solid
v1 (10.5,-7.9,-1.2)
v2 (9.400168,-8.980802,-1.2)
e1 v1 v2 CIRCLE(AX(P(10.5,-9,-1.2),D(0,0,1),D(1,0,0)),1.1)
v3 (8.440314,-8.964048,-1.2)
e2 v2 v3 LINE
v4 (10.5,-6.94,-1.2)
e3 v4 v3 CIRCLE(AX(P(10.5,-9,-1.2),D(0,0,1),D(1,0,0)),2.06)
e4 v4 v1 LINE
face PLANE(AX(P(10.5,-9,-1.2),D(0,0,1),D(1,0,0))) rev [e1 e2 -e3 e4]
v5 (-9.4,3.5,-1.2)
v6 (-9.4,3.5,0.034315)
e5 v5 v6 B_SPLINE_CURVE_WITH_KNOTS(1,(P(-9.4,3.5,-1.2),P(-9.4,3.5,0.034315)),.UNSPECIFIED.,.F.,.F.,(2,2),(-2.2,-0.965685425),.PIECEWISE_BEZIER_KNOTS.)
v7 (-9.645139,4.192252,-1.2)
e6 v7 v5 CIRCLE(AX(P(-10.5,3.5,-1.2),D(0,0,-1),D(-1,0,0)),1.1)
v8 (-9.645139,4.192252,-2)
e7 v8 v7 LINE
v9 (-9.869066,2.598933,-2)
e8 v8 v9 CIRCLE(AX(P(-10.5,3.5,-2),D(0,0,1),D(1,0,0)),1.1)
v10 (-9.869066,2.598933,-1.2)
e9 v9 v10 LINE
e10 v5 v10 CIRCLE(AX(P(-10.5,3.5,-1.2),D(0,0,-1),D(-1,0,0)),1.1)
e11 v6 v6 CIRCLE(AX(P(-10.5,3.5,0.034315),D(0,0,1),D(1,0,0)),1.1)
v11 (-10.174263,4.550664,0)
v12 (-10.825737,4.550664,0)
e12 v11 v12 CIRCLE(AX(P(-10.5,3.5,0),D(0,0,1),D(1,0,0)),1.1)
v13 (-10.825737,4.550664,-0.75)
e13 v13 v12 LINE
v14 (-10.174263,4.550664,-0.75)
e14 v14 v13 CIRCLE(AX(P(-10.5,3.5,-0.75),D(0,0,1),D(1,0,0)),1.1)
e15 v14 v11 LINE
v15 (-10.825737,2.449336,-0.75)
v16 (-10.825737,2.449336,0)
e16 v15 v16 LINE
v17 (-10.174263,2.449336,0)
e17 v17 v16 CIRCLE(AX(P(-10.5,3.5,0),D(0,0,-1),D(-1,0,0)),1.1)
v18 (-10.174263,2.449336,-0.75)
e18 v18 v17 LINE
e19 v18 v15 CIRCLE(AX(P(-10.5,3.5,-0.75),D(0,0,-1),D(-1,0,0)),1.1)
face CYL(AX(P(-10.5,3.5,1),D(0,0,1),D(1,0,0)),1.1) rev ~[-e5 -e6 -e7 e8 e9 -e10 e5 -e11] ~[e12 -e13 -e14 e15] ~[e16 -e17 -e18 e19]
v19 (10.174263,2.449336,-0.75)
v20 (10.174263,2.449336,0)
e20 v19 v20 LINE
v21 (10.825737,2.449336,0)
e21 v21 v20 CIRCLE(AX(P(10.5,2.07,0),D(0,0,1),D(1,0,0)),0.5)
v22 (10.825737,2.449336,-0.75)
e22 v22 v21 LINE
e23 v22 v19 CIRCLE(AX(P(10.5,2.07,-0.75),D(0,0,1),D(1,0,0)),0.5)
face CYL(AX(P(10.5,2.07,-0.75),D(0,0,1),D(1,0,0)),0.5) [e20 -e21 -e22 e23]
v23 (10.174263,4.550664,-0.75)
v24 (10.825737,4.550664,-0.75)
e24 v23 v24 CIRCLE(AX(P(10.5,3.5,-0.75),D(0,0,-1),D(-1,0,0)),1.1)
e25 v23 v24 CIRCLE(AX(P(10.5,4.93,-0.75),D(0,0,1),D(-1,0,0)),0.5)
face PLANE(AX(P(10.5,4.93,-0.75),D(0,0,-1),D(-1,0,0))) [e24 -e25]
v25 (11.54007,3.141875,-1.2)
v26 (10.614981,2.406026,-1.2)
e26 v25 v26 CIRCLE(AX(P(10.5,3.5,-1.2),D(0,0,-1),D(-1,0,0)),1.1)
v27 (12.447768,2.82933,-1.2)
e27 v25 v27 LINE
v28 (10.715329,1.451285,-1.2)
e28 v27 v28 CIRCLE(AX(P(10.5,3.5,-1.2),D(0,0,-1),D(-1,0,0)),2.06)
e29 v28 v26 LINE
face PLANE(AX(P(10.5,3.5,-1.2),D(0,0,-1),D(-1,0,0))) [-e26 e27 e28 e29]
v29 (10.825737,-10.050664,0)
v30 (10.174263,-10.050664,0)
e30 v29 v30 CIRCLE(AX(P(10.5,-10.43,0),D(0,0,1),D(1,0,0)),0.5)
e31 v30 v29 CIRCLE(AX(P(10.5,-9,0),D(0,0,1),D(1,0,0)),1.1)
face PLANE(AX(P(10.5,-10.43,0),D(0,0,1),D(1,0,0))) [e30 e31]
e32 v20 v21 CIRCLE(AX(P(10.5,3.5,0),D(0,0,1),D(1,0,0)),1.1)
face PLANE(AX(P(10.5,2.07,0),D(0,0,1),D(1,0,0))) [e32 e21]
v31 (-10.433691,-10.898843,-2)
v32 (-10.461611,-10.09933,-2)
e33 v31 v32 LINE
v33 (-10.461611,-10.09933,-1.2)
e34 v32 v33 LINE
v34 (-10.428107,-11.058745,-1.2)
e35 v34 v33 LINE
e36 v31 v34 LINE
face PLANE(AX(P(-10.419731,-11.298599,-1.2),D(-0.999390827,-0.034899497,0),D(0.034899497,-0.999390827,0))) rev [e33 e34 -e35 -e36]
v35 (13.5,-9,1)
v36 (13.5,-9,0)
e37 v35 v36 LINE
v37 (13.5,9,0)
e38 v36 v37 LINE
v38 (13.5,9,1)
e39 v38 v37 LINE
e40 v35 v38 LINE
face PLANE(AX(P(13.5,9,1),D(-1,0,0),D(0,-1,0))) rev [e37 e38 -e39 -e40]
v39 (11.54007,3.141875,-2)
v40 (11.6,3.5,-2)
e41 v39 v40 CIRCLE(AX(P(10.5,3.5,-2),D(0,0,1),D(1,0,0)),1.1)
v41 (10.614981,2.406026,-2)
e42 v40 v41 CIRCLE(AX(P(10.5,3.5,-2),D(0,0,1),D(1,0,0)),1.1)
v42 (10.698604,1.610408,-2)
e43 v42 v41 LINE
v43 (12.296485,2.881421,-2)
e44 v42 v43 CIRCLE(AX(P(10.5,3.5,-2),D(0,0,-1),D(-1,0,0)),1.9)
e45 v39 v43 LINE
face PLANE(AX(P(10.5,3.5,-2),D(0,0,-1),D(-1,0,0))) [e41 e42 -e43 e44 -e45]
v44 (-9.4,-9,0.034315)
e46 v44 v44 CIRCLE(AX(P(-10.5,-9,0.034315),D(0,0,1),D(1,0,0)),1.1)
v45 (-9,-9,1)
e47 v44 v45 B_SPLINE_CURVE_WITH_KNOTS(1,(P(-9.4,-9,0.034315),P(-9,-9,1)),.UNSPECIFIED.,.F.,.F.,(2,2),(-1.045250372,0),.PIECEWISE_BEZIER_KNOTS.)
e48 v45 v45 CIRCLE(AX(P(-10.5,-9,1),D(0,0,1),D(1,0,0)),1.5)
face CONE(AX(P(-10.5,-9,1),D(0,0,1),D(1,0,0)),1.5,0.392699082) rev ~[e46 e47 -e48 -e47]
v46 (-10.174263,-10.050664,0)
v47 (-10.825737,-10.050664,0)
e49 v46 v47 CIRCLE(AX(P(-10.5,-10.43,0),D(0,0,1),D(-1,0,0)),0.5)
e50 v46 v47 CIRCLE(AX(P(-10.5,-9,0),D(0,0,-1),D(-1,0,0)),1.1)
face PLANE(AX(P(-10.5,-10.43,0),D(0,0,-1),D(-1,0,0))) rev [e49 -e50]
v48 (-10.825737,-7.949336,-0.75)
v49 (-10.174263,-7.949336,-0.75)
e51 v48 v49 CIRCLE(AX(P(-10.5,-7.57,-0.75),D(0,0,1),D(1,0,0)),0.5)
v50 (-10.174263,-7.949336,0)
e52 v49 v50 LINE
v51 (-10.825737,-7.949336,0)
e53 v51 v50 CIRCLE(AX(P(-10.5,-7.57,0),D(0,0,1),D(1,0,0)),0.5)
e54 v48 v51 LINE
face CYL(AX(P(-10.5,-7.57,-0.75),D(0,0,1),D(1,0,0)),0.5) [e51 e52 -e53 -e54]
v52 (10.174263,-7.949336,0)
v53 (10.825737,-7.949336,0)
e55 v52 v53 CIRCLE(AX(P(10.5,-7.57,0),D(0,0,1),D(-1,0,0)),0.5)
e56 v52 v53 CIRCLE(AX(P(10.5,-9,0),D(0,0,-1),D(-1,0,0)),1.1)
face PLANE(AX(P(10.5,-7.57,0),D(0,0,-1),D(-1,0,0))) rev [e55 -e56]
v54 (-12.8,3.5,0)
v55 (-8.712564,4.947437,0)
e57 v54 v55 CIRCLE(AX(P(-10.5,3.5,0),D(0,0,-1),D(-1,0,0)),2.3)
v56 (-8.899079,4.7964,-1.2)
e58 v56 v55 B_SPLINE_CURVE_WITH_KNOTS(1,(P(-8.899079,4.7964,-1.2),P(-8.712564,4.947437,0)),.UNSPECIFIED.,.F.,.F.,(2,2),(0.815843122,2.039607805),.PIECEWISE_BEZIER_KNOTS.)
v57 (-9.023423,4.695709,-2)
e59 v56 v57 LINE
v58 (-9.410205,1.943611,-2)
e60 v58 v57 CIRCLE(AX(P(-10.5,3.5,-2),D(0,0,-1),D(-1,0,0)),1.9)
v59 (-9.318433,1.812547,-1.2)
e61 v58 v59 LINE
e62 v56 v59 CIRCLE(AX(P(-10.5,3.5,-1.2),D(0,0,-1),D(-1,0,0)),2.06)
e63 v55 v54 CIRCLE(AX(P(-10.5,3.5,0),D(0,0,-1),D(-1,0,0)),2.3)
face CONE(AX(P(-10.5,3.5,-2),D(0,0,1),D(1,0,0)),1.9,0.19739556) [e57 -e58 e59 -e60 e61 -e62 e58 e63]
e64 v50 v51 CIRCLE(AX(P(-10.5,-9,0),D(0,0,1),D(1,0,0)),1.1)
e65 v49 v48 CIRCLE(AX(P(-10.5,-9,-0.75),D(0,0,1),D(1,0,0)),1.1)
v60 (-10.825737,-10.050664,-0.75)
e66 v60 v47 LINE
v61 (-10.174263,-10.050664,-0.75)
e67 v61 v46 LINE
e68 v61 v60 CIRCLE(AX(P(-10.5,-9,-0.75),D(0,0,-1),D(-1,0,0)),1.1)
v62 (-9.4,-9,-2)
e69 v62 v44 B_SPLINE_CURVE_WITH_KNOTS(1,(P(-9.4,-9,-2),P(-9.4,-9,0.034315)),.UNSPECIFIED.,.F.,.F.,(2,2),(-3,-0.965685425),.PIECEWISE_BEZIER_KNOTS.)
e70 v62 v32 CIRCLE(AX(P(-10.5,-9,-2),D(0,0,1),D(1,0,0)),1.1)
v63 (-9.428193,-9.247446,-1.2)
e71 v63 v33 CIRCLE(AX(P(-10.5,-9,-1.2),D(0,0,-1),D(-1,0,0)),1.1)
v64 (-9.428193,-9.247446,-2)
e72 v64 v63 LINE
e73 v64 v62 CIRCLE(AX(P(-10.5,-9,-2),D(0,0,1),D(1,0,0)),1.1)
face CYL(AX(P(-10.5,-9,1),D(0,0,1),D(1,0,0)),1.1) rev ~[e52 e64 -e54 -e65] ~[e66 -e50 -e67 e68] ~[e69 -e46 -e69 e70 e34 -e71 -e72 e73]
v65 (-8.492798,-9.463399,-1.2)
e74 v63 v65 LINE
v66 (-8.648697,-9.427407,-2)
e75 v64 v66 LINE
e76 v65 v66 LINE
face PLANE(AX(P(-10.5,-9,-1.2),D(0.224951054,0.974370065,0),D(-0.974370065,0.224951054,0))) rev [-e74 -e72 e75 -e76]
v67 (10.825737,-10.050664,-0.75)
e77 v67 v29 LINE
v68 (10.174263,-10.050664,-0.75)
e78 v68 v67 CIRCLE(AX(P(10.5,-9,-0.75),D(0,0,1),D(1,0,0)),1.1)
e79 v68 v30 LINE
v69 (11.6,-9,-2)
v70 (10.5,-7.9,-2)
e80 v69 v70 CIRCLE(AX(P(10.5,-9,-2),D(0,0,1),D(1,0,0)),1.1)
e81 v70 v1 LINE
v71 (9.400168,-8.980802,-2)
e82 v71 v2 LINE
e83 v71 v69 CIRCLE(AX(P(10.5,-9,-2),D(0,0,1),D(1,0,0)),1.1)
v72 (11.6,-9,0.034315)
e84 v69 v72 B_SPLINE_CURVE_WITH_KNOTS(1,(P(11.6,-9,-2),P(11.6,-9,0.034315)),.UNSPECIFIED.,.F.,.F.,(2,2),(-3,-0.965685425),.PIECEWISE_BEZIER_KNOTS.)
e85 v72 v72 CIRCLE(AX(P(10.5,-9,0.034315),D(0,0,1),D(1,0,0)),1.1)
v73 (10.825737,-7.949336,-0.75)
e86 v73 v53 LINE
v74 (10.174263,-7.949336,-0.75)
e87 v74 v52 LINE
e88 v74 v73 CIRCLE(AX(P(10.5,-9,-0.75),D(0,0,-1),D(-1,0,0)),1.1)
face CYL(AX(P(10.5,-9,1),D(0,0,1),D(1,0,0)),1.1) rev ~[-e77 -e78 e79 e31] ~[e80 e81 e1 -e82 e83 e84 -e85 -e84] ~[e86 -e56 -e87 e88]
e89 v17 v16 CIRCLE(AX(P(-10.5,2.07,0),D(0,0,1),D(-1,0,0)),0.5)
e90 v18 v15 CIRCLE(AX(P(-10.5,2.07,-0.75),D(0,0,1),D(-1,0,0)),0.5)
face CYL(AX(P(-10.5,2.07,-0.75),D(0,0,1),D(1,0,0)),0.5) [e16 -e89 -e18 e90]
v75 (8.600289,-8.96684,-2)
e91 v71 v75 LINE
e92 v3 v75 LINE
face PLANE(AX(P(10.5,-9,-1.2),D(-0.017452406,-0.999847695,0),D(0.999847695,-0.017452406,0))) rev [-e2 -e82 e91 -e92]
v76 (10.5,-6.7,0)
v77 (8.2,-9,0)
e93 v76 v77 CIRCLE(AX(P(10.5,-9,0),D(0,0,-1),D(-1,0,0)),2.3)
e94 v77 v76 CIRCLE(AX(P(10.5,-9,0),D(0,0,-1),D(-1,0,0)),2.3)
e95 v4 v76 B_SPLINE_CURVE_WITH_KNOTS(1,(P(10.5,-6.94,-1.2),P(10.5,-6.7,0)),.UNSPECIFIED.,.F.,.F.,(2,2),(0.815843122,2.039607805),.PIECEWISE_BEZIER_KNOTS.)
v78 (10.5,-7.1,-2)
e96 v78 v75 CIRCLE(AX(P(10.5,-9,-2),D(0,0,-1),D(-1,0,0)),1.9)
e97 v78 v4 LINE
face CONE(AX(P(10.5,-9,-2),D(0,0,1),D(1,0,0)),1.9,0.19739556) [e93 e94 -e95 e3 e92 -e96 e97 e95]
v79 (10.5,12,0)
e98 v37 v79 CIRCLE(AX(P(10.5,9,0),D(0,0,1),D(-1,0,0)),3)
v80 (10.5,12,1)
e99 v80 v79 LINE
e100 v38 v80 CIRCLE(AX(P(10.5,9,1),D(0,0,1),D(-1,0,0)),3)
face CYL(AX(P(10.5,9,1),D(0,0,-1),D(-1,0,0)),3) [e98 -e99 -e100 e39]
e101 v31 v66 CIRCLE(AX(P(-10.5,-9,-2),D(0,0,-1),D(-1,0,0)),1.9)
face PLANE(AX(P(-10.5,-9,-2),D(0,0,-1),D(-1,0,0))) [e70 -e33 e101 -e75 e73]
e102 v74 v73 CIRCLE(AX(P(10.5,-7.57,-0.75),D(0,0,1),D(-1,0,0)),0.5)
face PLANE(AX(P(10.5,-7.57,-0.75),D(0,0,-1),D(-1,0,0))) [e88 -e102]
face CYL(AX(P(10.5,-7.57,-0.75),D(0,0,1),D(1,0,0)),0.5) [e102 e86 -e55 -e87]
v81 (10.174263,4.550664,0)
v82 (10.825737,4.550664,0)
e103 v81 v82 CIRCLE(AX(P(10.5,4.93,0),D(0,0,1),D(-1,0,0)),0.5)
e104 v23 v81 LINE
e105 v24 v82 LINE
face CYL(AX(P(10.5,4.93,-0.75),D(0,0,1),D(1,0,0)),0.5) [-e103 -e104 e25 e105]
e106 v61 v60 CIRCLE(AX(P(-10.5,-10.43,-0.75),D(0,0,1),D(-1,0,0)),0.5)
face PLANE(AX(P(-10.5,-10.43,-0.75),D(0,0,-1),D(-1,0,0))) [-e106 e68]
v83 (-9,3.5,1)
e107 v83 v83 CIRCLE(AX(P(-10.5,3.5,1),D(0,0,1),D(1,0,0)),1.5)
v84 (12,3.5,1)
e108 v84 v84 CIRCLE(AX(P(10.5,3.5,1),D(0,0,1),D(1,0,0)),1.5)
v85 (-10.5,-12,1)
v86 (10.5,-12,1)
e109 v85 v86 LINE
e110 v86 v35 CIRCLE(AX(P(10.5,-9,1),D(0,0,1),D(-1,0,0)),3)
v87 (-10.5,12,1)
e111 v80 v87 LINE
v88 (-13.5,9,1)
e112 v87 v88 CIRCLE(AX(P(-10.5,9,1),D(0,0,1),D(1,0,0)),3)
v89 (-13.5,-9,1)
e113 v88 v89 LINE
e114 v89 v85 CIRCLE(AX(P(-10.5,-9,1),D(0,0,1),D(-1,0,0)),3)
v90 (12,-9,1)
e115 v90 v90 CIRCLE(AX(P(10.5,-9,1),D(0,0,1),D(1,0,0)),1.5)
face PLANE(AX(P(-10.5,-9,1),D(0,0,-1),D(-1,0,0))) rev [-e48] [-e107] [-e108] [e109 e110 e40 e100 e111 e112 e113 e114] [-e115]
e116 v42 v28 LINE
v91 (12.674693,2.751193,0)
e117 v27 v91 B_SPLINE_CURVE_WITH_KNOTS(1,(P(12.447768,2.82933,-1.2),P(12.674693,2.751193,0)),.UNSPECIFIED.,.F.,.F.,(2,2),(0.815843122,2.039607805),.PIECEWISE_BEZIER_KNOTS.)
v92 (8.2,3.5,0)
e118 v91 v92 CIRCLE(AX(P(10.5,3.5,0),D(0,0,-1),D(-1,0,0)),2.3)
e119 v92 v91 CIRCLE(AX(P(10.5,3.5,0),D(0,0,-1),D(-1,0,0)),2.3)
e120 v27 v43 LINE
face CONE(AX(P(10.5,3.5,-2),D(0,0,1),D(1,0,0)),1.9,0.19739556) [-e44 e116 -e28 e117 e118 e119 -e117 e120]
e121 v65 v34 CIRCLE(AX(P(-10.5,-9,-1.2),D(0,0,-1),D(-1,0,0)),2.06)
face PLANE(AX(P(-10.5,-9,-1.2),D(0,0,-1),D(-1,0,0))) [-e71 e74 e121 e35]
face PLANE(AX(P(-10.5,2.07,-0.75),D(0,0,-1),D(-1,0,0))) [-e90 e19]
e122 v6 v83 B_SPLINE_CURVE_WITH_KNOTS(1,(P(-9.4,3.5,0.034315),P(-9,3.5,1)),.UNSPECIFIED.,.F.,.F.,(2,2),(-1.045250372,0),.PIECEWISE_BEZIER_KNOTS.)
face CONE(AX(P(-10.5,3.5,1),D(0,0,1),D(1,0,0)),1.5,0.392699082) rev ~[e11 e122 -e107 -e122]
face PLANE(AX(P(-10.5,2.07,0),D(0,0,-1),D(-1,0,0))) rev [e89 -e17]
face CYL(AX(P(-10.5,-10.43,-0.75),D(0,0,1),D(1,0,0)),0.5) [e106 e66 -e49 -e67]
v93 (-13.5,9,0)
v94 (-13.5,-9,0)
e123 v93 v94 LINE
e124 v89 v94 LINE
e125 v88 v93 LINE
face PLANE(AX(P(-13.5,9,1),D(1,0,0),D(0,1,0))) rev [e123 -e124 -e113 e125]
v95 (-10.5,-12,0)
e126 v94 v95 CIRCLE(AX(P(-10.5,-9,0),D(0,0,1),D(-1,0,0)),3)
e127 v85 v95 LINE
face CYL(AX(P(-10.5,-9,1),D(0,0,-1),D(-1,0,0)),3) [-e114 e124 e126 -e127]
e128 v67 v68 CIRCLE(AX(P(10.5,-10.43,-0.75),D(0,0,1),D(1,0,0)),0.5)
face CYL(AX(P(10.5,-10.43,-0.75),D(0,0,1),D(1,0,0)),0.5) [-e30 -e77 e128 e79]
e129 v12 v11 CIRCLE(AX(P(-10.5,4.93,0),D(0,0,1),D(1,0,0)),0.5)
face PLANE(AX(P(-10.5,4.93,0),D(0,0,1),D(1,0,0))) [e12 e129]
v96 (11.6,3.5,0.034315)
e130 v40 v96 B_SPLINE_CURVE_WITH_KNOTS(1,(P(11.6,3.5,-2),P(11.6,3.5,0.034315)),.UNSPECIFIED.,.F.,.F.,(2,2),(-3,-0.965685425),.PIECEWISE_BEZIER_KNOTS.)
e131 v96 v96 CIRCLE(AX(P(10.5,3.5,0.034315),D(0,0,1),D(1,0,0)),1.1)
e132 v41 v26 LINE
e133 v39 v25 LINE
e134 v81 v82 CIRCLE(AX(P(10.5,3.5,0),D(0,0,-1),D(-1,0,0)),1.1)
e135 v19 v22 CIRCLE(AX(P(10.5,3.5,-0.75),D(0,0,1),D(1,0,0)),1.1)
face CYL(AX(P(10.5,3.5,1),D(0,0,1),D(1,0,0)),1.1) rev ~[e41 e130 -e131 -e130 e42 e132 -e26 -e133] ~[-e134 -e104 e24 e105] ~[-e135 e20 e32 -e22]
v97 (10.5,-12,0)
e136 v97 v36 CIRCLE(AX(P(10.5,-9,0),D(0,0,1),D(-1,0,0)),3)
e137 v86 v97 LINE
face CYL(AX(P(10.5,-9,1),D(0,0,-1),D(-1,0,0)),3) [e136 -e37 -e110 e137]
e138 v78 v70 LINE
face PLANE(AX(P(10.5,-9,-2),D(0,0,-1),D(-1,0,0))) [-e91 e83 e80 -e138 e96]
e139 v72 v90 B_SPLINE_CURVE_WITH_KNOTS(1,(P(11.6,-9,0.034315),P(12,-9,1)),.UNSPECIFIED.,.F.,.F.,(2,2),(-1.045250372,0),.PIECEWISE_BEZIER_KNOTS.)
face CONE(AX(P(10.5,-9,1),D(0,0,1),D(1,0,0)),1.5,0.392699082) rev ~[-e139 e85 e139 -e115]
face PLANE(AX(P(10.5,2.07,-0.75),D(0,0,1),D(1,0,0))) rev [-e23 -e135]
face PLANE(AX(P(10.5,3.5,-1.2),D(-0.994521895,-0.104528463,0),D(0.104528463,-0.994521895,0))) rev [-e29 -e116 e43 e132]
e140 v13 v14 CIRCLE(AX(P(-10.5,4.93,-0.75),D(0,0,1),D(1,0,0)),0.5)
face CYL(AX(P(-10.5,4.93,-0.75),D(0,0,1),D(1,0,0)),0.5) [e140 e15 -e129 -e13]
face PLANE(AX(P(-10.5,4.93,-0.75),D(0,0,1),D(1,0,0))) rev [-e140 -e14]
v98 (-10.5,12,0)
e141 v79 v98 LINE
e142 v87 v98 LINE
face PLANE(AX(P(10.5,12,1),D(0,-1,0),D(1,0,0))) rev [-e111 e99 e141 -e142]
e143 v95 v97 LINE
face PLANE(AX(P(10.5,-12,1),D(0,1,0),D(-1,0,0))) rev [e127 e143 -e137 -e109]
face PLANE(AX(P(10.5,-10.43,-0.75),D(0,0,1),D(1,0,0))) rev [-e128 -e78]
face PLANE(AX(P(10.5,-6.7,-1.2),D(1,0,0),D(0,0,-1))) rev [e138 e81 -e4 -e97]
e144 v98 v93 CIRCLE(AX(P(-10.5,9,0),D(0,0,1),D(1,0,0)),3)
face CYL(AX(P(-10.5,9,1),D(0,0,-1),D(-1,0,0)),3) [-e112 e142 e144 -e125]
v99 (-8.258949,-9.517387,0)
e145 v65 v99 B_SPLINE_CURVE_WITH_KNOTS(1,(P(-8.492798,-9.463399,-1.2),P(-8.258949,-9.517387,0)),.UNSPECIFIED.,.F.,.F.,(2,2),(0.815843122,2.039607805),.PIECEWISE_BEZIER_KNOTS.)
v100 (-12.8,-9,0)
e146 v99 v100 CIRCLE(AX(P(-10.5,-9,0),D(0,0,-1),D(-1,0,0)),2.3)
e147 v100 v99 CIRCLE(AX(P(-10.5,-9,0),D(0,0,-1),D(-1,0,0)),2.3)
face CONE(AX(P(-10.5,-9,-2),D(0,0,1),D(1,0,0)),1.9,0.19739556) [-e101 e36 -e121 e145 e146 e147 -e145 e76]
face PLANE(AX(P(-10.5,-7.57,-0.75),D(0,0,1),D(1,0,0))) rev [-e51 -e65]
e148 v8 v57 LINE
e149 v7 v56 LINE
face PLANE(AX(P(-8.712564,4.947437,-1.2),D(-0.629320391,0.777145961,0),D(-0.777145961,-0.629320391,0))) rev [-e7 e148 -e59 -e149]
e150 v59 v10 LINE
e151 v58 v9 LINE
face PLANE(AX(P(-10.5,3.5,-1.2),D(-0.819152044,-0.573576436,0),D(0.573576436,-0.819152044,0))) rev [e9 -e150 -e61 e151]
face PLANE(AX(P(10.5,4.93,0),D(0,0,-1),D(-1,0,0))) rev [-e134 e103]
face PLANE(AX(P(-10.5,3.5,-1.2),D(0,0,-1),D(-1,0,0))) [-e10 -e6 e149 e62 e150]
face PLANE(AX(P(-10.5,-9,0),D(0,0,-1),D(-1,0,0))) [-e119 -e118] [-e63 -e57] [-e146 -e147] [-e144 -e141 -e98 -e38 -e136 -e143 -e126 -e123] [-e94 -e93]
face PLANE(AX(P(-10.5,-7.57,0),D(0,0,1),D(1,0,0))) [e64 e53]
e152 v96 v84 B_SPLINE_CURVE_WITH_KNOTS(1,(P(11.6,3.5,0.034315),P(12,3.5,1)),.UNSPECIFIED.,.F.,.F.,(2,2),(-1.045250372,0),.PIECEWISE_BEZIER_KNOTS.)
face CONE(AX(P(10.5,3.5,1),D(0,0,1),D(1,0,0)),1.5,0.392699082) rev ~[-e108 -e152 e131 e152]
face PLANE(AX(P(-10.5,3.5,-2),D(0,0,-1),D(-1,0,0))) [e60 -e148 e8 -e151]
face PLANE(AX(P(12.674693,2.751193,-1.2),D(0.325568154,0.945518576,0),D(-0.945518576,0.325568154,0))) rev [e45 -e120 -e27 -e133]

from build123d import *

# Parameters (mm, degrees)
BOSS_EXTRUDE1_DEPTH           = 1
SKETCH4_R                     = 2.3
BOSS_EXTRUDE2_DEPTH           = 2
M2_CLEARANCE_HOLE1_AT_2_COUNT = 2
M2_CLEARANCE_HOLE1_AT_2_PITCH = 12.5
M2_CLEARANCE_HOLE1_AT_3_COUNT = 2
M2_CLEARANCE_HOLE1_AT_3_PITCH = 24.43869882
M2_CLEARANCE_HOLE1_AT_4_COUNT = 2
M2_CLEARANCE_HOLE1_AT_4_PITCH = 21
BOSS_EXTRUDE3_START           = -1
BOSS_EXTRUDE3_DEPTH           = 0.75
CHAMFER1_SIZE                 = 0.4
CHAMFER1_SIZE_2               = 2
CUT_EXTRUDE2_DEPTH            = 0.8


with BuildPart() as part:
    # Sketch1 → Boss-Extrude1 (new body)
    with BuildSketch(Plane.XY):
        with BuildLine():
            Line((10.5, 12), (-10.5, 12))
            ThreePointArc((-10.5, 12), (-12.621320344, 11.121320344), (-13.5, 9))
            Line((-13.5, 9), (-13.5, -9))
            ThreePointArc((-13.5, -9), (-12.621320344, -11.121320344), (-10.5, -12))
            Line((-10.5, -12), (10.5, -12))
            ThreePointArc((10.5, -12), (12.621320344, -11.121320344), (13.5, -9))
            Line((13.5, -9), (13.5, 9))
            ThreePointArc((13.5, 9), (12.621320344, 11.121320344), (10.5, 12))
        make_face()
    extrude(amount=BOSS_EXTRUDE1_DEPTH)

    # Sketch4 → Boss-Extrude2 (add)
    with BuildSketch(Plane(origin=(0, 0, 0), x_dir=(-1, 0, 0), z_dir=(0, 0, -1))):
        with Locations((-10.5, 3.5)):
            Circle(SKETCH4_R)
        with Locations((10.5, 3.5)):
            Circle(SKETCH4_R)
        with Locations((10.5, -9)):
            Circle(SKETCH4_R)
        with Locations((-10.5, -9)):
            Circle(SKETCH4_R)
    extrude(amount=BOSS_EXTRUDE2_DEPTH)

    # Sketch3 → M2 Clearance Hole1 (revolve, cut)
    with BuildSketch(Plane(origin=(10.5, 3.5, 1), x_dir=(0, -1, 0), z_dir=(1, 0, 0))):
        Polygon((0, 0), (0, 3), (1.1, 3), (1.1, 0.965685425), (1.5, 0), align=None)
    m2_clearance_hole1 = revolve(axis=Axis((10.5, 3.5, 7.35), (0, 0, -1)), mode=Mode.SUBTRACT)

    # M2 Clearance Hole1 at 2: M2 Clearance Hole1 ×2
    with Locations(*[(0, -i * M2_CLEARANCE_HOLE1_AT_2_PITCH, 0) for i in range(1, M2_CLEARANCE_HOLE1_AT_2_COUNT)]):
        add(m2_clearance_hole1, mode=Mode.SUBTRACT)

    # M2 Clearance Hole1 at 3: M2 Clearance Hole1 ×2
    with Locations(*[Vector(-0.8592928844097065, -0.5114838597676831, 0) * (i * M2_CLEARANCE_HOLE1_AT_3_PITCH) for i in range(1, M2_CLEARANCE_HOLE1_AT_3_COUNT)]):
        add(m2_clearance_hole1, mode=Mode.SUBTRACT)

    # M2 Clearance Hole1 at 4: M2 Clearance Hole1 ×2
    with Locations(*[(-i * M2_CLEARANCE_HOLE1_AT_4_PITCH, 0, 0) for i in range(1, M2_CLEARANCE_HOLE1_AT_4_COUNT)]):
        add(m2_clearance_hole1, mode=Mode.SUBTRACT)

    # Sketch6 → Boss-Extrude3 (add)
    with BuildSketch(Plane.XY.offset(1).offset(BOSS_EXTRUDE3_START)):
        with BuildLine():
            Line((10.124367201, 2.4), (10.875632799, 2.4))
            ThreePointArc((10.875632799, 2.4), (10.5, 2.57), (10.124367201, 2.4))
        make_face()
        with BuildLine():
            Line((10.124367201, 4.6), (10.875632799, 4.6))
            ThreePointArc((10.875632799, 4.6), (10.5, 4.43), (10.124367201, 4.6))
        make_face()
        with BuildLine():
            Line((-10.124367201, 2.4), (-10.875632799, 2.4))
            ThreePointArc((-10.875632799, 2.4), (-10.5, 2.57), (-10.124367201, 2.4))
        make_face()
        with BuildLine():
            Line((-10.124367201, 4.6), (-10.875632799, 4.6))
            ThreePointArc((-10.875632799, 4.6), (-10.5, 4.43), (-10.124367201, 4.6))
        make_face()
        with BuildLine():
            Line((10.124367201, -10.1), (10.875632799, -10.1))
            ThreePointArc((10.875632799, -10.1), (10.5, -9.93), (10.124367201, -10.1))
        make_face()
        with BuildLine():
            Line((10.124367201, -7.9), (10.875632799, -7.9))
            ThreePointArc((10.875632799, -7.9), (10.5, -8.07), (10.124367201, -7.9))
        make_face()
        with BuildLine():
            Line((-10.124367201, -10.1), (-10.875632799, -10.1))
            ThreePointArc((-10.875632799, -10.1), (-10.5, -9.93), (-10.124367201, -10.1))
        make_face()
        with BuildLine():
            Line((-10.124367201, -7.9), (-10.875632799, -7.9))
            ThreePointArc((-10.875632799, -7.9), (-10.5, -8.07), (-10.124367201, -7.9))
        make_face()
    extrude(amount=-BOSS_EXTRUDE3_DEPTH)

    # Chamfer1
    # the kernel refuses this chamfer: 2, 0.4 mm, written as the material it takes off along each edge
    with BuildSketch(Plane(origin=(10.5, 3.5, -2), x_dir=(-1, 0, 0), z_dir=(0, -1, 0))) as chamfer1_piece_1_section:
        Polygon((2.3 - CHAMFER1_SIZE, 0), (2.3, -CHAMFER1_SIZE_2), (2.3, 0), align=None)
    chamfer1_piece_1 = revolve(axis=Axis((10.5, 3.5, -2), (0, 0, -1)), mode=Mode.PRIVATE)
    chamfer1_piece_1 = split(chamfer1_piece_1, bisect_by=Plane(origin=(12.610878193, 3.5, 0), z_dir=(0, 0, -1)), keep=Keep.TOP, mode=Mode.PRIVATE)
    add(chamfer1_piece_1, mode=Mode.SUBTRACT)
    with BuildSketch(Plane(origin=(-10.5, 3.5, -2), x_dir=(-1, 0, 0), z_dir=(0, -1, 0))) as chamfer1_piece_2_section:
        Polygon((2.3 - CHAMFER1_SIZE, 0), (2.3, -CHAMFER1_SIZE_2), (2.3, 0), align=None)
    chamfer1_piece_2 = revolve(axis=Axis((-10.5, 3.5, -2), (0, 0, -1)), mode=Mode.PRIVATE)
    chamfer1_piece_2 = split(chamfer1_piece_2, bisect_by=Plane(origin=(-8.389121807, 3.5, 0), z_dir=(0, 0, -1)), keep=Keep.TOP, mode=Mode.PRIVATE)
    add(chamfer1_piece_2, mode=Mode.SUBTRACT)
    with BuildSketch(Plane(origin=(-10.5, -9, -2), x_dir=(-1, 0, 0), z_dir=(0, -1, 0))) as chamfer1_piece_3_section:
        Polygon((2.3 - CHAMFER1_SIZE, 0), (2.3, -CHAMFER1_SIZE_2), (2.3, 0), align=None)
    chamfer1_piece_3 = revolve(axis=Axis((-10.5, -9, -2), (0, 0, -1)), mode=Mode.PRIVATE)
    chamfer1_piece_3 = split(chamfer1_piece_3, bisect_by=Plane(origin=(-8.389121807, -9, 0), z_dir=(0, 0, -1)), keep=Keep.TOP, mode=Mode.PRIVATE)
    add(chamfer1_piece_3, mode=Mode.SUBTRACT)
    with BuildSketch(Plane(origin=(10.5, -9, -2), x_dir=(-1, 0, 0), z_dir=(0, -1, 0))) as chamfer1_piece_4_section:
        Polygon((2.3 - CHAMFER1_SIZE, 0), (2.3, -CHAMFER1_SIZE_2), (2.3, 0), align=None)
    chamfer1_piece_4 = revolve(axis=Axis((10.5, -9, -2), (0, 0, -1)), mode=Mode.PRIVATE)
    chamfer1_piece_4 = split(chamfer1_piece_4, bisect_by=Plane(origin=(12.610878193, -9, 0), z_dir=(0, 0, -1)), keep=Keep.TOP, mode=Mode.PRIVATE)
    add(chamfer1_piece_4, mode=Mode.SUBTRACT)

    # Sketch5 → Cut-Extrude2 (cut)
    with BuildSketch(Plane(origin=(0, 0, -2), x_dir=(-1, 0, 0), z_dir=(0, 0, -1))):
        with BuildLine():
            Line((8.712564289, 4.947436899), (10.5, 3.5))
            Line((10.5, 3.5), (9.180774196, 1.615950298))
            ThreePointArc((9.180774196, 1.615950298), (8.222383442, 3.179901868), (8.712564289, 4.947436899))
        make_face()
        with BuildLine():
            Line((10.419731158, -11.298598902), (10.5, -9))
            Line((10.5, -9), (8.258948851, -9.517387425))
            ThreePointArc((8.258948851, -9.517387425), (9.037020093, -10.774736542), (10.419731158, -11.298598902))
        make_face()
        with BuildLine():
            Line((-12.674692724, 2.751193245), (-10.5, 3.5))
            Line((-10.5, 3.5), (-10.740415466, 1.212599641))
            ThreePointArc((-10.740415466, 1.212599641), (-11.931783664, 1.700001239), (-12.674692724, 2.751193245))
        make_face()
        with BuildLine():
            Line((-10.5, -6.7), (-10.5, -9))
            Line((-10.5, -9), (-8.200350301, -8.959859465))
            ThreePointArc((-8.200350301, -8.959859465), (-8.887908692, -7.359523967), (-10.5, -6.7))
        make_face()
    extrude(amount=-CUT_EXTRUDE2_DEPTH, mode=Mode.SUBTRACT)


solid = part.part
